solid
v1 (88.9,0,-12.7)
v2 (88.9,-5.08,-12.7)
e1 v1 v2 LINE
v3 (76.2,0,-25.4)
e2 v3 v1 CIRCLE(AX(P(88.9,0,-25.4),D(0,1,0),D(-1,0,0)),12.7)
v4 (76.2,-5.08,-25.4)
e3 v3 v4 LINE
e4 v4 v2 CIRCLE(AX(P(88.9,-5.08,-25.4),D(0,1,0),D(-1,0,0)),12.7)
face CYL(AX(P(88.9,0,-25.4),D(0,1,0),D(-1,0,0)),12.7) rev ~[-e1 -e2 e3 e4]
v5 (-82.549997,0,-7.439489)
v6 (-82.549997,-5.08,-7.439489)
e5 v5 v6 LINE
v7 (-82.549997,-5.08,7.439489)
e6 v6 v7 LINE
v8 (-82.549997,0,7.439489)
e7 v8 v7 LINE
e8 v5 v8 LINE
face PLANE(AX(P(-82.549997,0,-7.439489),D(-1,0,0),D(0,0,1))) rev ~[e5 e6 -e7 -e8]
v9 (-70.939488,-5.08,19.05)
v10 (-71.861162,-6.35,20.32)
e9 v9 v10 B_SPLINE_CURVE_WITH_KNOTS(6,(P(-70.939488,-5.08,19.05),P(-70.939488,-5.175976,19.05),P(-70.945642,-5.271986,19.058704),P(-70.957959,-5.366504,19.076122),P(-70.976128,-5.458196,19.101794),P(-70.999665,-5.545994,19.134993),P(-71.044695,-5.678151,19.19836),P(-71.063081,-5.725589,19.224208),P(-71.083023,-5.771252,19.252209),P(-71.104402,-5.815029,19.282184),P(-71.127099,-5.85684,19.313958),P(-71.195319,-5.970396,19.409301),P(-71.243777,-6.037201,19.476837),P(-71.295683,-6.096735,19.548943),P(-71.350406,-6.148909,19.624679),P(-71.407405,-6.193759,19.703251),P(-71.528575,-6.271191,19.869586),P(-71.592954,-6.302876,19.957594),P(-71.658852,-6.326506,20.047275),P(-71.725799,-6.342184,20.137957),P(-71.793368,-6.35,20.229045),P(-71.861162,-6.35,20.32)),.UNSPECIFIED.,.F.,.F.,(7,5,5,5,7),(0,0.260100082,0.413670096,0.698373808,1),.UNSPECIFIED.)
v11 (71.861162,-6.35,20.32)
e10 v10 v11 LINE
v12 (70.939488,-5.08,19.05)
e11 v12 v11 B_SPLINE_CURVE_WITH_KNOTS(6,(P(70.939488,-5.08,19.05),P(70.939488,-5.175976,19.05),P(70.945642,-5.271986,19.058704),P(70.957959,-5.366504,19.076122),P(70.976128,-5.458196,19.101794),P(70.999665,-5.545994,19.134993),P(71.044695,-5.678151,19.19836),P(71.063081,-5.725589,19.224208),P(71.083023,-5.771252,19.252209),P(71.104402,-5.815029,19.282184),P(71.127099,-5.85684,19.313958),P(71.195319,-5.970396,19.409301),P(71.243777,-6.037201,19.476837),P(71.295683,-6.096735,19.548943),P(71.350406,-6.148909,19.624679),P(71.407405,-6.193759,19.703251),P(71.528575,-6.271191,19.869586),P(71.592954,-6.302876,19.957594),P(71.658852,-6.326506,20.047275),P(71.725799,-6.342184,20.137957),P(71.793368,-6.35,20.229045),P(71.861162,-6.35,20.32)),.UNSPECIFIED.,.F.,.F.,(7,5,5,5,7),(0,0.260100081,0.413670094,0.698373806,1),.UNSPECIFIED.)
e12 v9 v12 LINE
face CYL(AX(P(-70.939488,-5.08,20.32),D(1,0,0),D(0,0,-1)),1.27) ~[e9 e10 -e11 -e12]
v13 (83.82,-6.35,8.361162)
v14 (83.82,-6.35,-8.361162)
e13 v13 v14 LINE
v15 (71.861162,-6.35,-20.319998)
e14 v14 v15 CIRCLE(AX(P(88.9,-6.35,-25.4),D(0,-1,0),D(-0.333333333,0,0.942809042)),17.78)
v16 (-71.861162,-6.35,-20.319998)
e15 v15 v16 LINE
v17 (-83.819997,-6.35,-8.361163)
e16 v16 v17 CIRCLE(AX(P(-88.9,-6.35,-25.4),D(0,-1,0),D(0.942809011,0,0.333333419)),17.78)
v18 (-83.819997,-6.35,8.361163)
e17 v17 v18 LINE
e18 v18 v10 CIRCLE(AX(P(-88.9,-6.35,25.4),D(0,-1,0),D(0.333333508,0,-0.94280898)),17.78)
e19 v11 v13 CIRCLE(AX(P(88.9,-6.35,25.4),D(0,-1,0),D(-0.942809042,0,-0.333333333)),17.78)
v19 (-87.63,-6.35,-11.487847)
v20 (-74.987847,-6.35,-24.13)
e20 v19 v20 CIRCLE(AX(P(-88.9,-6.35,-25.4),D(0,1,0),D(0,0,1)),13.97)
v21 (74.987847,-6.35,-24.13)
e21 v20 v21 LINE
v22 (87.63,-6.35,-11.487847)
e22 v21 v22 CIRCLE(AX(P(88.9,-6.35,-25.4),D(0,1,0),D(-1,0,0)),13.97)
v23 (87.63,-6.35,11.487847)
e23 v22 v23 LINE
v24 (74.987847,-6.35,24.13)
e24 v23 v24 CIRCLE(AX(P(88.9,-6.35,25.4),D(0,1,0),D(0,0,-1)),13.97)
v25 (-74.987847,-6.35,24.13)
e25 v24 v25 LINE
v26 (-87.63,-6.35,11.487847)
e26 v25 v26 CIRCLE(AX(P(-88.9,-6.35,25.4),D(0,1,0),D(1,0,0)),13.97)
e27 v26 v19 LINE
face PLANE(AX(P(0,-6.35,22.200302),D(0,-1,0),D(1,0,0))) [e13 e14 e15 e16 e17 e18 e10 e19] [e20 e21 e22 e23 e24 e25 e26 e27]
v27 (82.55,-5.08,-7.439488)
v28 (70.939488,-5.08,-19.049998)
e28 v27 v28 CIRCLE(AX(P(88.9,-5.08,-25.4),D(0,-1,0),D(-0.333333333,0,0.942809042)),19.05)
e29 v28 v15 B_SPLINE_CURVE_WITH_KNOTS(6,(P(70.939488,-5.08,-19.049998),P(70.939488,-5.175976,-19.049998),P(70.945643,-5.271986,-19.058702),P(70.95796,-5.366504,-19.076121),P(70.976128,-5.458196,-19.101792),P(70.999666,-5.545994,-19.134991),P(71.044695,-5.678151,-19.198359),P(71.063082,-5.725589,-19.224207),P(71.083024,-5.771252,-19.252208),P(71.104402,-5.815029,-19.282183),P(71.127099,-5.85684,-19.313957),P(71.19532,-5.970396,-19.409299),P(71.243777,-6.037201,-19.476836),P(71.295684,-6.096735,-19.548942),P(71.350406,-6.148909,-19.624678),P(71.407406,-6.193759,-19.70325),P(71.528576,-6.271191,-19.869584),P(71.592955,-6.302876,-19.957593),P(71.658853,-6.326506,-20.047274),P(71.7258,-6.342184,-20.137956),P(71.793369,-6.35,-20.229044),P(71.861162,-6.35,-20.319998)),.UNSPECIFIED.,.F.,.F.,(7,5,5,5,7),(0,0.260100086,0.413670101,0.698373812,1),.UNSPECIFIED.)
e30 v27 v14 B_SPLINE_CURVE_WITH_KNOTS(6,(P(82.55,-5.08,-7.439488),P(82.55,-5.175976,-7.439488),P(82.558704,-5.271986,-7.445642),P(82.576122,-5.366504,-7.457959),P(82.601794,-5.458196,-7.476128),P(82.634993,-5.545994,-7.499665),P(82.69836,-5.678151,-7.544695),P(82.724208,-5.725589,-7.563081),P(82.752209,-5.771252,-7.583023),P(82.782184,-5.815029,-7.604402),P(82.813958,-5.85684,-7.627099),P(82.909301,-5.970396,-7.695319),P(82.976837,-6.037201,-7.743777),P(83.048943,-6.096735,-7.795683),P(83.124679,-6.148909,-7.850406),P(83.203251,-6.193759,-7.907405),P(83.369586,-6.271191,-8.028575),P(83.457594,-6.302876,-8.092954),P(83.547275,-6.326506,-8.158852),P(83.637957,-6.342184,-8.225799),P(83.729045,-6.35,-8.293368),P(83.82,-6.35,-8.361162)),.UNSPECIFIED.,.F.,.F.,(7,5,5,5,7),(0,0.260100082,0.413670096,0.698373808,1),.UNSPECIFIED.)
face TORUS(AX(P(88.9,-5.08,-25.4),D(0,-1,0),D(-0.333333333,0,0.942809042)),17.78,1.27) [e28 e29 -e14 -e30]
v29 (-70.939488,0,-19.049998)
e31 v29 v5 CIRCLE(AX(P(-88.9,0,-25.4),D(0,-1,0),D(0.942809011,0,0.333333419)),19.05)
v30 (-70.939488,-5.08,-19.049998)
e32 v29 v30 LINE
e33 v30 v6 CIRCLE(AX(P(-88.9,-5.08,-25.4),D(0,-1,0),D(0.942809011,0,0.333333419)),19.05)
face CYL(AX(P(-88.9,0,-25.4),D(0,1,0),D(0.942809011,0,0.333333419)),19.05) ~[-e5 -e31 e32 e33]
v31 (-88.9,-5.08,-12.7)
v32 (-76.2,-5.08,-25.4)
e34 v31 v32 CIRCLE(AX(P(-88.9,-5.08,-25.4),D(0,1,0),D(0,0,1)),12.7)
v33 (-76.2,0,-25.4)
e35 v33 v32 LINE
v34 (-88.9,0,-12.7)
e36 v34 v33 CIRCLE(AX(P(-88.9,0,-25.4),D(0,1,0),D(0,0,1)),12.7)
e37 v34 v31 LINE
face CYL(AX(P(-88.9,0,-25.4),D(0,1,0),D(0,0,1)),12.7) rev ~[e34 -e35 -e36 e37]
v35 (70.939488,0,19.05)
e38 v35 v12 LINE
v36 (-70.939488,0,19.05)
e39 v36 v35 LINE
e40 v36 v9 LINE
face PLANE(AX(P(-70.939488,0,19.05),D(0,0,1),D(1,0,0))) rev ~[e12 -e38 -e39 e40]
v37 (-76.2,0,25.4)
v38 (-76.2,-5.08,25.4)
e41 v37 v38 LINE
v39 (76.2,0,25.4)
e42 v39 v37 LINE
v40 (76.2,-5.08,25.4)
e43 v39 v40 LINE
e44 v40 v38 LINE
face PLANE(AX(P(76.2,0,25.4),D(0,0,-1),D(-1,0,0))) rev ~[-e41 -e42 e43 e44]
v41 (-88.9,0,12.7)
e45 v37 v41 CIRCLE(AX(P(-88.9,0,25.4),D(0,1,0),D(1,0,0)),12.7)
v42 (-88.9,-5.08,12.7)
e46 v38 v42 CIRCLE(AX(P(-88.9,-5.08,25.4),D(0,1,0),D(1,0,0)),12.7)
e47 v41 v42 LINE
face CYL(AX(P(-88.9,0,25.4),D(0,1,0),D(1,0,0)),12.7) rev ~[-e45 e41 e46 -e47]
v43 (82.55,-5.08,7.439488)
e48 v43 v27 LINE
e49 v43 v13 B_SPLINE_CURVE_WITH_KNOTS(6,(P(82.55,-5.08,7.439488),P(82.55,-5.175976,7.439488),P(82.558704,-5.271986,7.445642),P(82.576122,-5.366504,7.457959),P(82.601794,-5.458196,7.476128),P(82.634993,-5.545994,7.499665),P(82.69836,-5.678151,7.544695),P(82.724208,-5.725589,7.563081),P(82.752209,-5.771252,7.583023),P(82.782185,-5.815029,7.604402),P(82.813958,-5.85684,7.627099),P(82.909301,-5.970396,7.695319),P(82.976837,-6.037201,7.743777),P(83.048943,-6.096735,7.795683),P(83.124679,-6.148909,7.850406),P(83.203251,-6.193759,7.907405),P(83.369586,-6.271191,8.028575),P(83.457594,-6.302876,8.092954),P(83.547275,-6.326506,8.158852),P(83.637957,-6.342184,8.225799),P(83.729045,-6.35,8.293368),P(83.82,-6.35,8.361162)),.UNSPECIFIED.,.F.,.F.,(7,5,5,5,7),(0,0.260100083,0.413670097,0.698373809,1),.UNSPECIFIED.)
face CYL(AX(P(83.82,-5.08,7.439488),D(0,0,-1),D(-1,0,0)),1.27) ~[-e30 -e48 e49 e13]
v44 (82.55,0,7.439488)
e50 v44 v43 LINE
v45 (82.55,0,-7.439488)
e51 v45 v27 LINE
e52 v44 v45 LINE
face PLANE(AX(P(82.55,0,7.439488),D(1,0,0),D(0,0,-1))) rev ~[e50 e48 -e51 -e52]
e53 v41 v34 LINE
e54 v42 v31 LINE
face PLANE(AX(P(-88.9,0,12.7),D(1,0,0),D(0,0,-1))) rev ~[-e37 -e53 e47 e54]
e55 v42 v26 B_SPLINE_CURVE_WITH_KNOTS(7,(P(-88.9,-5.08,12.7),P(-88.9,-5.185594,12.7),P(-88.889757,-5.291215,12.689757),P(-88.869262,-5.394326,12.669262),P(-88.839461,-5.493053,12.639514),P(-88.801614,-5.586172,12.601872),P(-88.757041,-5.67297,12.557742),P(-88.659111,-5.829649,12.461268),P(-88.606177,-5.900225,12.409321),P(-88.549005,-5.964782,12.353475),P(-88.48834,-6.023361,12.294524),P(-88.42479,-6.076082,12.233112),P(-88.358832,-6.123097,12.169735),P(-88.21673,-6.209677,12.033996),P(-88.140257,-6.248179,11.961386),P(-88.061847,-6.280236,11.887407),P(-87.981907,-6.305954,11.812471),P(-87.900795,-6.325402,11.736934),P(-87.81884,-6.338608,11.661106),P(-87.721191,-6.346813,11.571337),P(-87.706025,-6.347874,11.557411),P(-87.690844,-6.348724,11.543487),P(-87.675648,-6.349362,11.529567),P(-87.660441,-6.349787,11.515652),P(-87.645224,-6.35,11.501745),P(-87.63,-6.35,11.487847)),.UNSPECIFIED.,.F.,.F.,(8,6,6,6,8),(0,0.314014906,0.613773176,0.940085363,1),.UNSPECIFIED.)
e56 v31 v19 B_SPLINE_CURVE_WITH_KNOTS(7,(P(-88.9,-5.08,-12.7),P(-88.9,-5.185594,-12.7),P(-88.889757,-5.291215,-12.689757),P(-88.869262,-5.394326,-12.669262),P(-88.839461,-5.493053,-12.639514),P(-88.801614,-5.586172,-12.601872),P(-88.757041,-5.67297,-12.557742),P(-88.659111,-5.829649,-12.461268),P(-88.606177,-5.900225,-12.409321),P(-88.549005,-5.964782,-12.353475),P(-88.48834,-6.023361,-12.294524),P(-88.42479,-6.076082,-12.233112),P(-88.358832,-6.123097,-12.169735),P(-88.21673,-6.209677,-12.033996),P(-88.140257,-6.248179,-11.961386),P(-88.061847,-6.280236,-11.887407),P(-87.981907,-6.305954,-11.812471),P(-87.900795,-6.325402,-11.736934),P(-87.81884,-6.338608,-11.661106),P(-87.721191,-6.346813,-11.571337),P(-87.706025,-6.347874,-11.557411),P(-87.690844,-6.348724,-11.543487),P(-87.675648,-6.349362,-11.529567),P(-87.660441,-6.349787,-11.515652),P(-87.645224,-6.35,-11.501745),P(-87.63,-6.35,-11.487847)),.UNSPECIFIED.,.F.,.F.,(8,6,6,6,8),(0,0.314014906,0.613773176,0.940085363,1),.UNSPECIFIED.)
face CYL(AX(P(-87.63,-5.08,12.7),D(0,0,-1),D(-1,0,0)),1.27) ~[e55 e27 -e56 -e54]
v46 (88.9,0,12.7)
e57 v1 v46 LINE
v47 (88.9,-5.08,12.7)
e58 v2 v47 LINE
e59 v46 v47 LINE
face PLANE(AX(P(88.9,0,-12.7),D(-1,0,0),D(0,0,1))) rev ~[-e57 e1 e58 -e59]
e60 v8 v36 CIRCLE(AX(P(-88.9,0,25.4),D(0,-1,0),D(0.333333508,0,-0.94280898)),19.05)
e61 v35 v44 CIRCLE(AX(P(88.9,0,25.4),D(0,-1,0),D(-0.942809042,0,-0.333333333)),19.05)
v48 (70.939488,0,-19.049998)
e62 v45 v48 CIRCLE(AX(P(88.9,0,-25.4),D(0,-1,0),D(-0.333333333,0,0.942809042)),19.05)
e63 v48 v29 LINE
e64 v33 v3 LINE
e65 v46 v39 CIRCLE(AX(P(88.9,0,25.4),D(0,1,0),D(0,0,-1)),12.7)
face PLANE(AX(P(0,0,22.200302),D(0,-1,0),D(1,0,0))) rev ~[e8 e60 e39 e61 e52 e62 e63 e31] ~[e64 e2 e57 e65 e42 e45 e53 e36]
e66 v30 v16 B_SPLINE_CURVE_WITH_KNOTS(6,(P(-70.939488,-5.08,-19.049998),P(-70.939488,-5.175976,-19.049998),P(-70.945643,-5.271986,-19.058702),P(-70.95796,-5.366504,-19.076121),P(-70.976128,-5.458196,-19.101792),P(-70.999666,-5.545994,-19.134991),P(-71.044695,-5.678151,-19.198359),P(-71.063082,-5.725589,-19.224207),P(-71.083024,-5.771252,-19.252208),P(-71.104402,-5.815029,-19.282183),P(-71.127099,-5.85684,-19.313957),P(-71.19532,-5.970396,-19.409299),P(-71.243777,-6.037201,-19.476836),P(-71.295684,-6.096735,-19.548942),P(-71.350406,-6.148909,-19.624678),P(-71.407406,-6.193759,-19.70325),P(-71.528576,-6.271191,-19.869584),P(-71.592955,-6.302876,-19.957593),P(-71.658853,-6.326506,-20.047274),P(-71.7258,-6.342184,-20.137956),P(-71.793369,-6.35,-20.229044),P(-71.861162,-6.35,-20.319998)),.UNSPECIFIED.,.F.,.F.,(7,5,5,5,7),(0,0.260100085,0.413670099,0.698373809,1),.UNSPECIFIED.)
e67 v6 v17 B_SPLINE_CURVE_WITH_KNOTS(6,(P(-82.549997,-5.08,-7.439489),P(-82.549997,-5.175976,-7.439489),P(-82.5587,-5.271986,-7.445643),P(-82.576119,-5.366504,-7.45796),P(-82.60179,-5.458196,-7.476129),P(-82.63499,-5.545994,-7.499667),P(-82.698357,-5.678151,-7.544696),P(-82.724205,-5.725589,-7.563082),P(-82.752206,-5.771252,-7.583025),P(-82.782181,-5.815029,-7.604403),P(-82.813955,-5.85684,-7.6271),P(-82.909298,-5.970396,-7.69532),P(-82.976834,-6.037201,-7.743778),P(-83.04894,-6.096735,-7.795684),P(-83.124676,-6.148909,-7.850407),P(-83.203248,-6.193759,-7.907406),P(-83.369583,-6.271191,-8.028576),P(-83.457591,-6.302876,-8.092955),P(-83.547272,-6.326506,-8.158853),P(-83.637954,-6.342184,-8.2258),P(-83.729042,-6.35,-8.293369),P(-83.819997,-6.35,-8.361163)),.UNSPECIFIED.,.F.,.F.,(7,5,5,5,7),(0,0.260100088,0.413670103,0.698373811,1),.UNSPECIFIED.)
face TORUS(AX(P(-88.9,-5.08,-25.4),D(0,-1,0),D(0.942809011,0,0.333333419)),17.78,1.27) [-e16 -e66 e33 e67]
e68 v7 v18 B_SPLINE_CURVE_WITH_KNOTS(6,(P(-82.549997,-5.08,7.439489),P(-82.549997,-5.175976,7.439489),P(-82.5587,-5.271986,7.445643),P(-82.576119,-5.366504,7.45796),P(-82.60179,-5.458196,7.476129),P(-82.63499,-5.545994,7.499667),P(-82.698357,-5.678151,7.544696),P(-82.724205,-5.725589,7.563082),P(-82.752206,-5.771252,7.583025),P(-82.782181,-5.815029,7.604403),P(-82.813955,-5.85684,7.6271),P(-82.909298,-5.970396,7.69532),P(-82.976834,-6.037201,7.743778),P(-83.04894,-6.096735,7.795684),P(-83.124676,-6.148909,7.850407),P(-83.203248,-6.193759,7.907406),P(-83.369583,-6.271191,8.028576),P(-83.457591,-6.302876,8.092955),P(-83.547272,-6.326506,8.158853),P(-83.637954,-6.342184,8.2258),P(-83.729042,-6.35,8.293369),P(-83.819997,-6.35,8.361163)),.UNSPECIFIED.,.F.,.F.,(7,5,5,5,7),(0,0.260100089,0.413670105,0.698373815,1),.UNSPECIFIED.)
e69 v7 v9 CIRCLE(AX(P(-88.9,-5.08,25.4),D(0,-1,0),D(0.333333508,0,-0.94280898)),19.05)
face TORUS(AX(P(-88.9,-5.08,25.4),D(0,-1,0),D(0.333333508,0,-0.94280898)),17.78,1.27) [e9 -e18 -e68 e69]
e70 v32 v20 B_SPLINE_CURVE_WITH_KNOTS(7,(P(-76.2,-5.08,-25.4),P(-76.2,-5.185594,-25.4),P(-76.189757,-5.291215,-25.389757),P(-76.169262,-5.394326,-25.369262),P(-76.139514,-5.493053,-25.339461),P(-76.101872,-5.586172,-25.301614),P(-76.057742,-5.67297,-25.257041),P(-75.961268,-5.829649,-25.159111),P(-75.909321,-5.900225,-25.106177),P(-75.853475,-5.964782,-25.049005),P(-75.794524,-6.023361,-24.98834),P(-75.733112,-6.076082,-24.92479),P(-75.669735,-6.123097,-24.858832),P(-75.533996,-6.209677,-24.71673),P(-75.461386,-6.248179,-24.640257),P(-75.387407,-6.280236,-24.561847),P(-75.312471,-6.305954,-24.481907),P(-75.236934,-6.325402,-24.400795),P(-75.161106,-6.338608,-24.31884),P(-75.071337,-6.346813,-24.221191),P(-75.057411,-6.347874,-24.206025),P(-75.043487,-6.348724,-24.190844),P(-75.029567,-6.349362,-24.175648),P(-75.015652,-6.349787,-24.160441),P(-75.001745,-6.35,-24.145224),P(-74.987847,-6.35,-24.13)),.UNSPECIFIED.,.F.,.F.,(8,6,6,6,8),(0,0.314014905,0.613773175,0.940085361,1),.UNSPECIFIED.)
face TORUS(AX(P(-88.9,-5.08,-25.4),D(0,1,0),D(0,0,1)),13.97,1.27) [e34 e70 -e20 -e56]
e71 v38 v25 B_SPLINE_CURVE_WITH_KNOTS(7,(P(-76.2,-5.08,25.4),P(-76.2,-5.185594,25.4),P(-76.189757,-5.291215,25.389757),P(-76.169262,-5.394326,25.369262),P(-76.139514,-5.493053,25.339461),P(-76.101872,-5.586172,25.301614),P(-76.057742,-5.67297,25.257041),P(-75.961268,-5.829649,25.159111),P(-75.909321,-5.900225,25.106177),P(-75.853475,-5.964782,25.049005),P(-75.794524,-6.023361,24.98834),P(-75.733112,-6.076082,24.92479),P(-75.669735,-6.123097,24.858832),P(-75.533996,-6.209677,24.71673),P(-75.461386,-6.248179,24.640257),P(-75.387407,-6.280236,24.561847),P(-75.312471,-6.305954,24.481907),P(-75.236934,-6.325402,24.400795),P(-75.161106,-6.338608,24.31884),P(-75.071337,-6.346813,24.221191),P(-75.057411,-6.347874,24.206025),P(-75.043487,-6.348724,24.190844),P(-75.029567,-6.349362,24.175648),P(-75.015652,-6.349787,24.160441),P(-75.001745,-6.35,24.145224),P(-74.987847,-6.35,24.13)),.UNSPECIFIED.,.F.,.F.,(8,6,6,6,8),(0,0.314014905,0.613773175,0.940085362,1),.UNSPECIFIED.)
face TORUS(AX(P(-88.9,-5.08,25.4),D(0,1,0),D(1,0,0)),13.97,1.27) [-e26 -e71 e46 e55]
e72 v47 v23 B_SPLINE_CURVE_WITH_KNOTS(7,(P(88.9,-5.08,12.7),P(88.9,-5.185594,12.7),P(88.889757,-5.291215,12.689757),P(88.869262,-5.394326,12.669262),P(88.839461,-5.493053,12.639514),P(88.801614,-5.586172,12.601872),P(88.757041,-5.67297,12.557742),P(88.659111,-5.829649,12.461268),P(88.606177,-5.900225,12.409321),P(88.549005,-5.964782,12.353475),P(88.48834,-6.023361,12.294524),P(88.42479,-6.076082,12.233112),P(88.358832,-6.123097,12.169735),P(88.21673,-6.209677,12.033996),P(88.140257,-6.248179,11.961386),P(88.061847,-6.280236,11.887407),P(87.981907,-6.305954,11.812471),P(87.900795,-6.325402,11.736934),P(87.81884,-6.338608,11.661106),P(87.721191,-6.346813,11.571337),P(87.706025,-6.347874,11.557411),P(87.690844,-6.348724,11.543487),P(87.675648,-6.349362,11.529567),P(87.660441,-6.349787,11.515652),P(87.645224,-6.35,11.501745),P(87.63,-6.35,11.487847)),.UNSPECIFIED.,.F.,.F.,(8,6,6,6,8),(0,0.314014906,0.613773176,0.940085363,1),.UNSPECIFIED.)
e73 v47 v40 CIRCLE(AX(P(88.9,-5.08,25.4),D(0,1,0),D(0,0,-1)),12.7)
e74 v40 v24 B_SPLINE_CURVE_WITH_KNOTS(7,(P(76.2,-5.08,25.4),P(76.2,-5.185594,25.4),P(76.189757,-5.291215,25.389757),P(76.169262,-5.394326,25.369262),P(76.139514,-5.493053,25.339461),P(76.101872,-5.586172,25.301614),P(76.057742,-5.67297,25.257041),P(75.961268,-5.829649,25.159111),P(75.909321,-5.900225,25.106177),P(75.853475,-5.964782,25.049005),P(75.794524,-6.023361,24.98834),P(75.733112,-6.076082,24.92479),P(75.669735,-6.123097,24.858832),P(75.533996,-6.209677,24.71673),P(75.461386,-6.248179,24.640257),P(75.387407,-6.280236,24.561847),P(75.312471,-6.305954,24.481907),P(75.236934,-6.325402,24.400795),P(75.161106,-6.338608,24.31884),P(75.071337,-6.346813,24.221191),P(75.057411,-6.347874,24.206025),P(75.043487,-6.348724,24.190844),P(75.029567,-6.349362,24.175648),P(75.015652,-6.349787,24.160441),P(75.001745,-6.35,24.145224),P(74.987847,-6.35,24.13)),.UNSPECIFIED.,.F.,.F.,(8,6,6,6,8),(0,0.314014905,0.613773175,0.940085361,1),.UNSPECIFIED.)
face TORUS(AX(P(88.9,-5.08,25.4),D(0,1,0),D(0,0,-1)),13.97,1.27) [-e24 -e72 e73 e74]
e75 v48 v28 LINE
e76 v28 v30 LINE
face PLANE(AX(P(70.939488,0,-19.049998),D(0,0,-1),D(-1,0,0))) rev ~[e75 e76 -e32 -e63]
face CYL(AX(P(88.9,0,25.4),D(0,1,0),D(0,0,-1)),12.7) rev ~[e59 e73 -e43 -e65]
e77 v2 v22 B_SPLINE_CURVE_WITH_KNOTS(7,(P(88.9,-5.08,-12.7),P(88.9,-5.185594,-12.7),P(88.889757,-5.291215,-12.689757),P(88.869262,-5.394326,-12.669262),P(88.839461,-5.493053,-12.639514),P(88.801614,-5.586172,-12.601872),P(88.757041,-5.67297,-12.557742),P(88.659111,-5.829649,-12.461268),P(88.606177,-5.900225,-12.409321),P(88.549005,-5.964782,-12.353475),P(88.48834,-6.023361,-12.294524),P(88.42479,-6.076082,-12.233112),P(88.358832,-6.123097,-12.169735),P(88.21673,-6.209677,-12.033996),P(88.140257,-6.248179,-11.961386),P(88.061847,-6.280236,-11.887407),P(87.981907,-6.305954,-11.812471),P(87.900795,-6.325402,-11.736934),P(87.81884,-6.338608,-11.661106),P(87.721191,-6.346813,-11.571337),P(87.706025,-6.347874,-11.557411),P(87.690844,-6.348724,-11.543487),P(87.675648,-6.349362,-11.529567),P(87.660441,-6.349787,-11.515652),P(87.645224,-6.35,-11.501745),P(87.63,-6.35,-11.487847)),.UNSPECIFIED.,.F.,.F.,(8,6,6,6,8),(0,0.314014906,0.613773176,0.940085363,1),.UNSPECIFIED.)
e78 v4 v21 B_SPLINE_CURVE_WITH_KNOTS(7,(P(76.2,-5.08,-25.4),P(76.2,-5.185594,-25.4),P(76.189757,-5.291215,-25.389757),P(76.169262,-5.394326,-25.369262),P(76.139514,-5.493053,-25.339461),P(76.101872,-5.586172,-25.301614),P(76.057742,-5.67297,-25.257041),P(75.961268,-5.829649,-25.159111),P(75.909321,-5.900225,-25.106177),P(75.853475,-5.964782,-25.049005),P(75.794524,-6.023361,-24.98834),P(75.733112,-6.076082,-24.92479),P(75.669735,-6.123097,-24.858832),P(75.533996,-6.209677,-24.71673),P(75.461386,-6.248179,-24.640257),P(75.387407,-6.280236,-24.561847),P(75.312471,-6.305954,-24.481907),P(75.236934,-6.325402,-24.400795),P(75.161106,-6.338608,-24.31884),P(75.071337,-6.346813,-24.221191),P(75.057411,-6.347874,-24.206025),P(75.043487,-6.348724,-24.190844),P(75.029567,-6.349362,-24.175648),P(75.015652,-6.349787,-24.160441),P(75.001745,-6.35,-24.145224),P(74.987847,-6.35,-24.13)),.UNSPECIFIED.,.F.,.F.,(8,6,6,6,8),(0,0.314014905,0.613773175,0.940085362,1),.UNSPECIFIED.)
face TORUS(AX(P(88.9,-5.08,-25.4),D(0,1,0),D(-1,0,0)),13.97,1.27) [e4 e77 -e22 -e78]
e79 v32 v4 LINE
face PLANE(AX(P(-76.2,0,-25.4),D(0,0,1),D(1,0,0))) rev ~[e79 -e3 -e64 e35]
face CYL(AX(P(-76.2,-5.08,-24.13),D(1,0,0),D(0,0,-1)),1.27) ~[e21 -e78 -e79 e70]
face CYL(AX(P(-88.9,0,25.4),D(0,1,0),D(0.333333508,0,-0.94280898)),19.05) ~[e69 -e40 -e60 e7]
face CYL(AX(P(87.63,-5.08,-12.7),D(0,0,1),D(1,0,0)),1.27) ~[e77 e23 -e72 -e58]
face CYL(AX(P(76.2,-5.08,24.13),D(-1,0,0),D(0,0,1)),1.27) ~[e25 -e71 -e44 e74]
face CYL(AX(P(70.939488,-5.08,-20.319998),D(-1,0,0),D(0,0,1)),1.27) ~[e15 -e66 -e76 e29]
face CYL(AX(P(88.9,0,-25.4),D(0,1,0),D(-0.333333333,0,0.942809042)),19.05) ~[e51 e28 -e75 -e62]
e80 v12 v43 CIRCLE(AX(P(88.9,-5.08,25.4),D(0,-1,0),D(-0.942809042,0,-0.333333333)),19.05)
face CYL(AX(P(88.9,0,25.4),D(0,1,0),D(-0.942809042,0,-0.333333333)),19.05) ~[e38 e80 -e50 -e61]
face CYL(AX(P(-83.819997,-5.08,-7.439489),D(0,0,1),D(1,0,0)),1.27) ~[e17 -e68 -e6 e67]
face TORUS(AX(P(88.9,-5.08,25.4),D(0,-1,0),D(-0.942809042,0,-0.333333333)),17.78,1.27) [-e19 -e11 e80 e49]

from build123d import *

# Parameters (mm, degrees)
F1_DEPTH = 6.35
F2_R     = 1.27


with BuildPart() as f1:
    # F0 (on Front) → F1 (new body)
    with BuildSketch(Plane.XZ):
        with BuildLine():
            ThreePointArc((-69.85, 25.4), (-70.1243474386, 22.1786073053), (-70.9394877579, 19.05))
            Line((-70.9394877579, 19.05), (70.9394877579, 19.05))
            ThreePointArc((70.9394877579, 19.05), (70.1243474386, 22.1786073053), (69.85, 25.4))
            Line((69.85, 25.4), (-69.85, 25.4))
        make_face()
        with BuildLine():
            Line((-88.9, 12.7), (-88.9, 6.35))
            ThreePointArc((-88.9, 6.35), (-85.6786055668, 6.6243477369), (-82.5499966741, 7.4394889338))
            ThreePointArc((-82.5499966741, 7.4394889338), (-75.4296145712, 11.9296170656), (-70.9394877579, 19.05))
            ThreePointArc((-70.9394877579, 19.05), (-70.1243474386, 22.1786073053), (-69.85, 25.4))
            Line((-69.85, 25.4), (-76.2, 25.4))
            ThreePointArc((-76.2, 25.4), (-79.9197438789, 16.4197438789), (-88.9, 12.7))
        make_face()
        with BuildLine():
            ThreePointArc((-88.9, -12.7), (-79.9197438789, -16.4197438789), (-76.2, -25.4))
            Line((-76.2, -25.4), (-69.85, -25.4))
            ThreePointArc((-69.85, -25.4), (-70.1243475845, -22.1786064547), (-70.9394883332, -19.0499983728))
            ThreePointArc((-70.9394883332, -19.0499983728), (-75.4296151814, -11.9296164554), (-82.5499966741, -7.4394889338))
            ThreePointArc((-82.5499966741, -7.4394889338), (-85.6786055668, -6.6243477369), (-88.9, -6.35))
            Line((-88.9, -6.35), (-88.9, -12.7))
        make_face()
        with BuildLine():
            Line((-88.9, 6.35), (-88.9, -6.35))
            ThreePointArc((-88.9, -6.35), (-85.6786055668, -6.6243477369), (-82.5499966741, -7.4394889338))
            Line((-82.5499966741, -7.4394889338), (-82.5499966741, 7.4394889338))
            ThreePointArc((-82.5499966741, 7.4394889338), (-85.6786055668, 6.6243477369), (-88.9, 6.35))
        make_face()
        with BuildLine():
            ThreePointArc((-70.9394883332, -19.0499983728), (-70.1243475845, -22.1786064547), (-69.85, -25.4))
            Line((-69.85, -25.4), (69.85, -25.4))
            ThreePointArc((69.85, -25.4), (70.1243475845, -22.1786064547), (70.9394883332, -19.0499983728))
            Line((70.9394883332, -19.0499983728), (-70.9394883332, -19.0499983728))
        make_face()
        with BuildLine():
            ThreePointArc((70.9394883332, -19.0499983728), (70.1243475845, -22.1786064547), (69.85, -25.4))
            Line((69.85, -25.4), (76.2, -25.4))
            ThreePointArc((76.2, -25.4), (79.9197438789, -16.4197438789), (88.9, -12.7))
            Line((88.9, -12.7), (88.9, -6.35))
            ThreePointArc((88.9, -6.35), (85.6786073053, -6.6243474386), (82.55, -7.4394877579))
            ThreePointArc((82.55, -7.4394877579), (75.4296164286, -11.9296152082), (70.9394883332, -19.0499983728))
        make_face()
        with BuildLine():
            Line((82.55, 7.4394877579), (82.55, -7.4394877579))
            ThreePointArc((82.55, -7.4394877579), (85.6786073053, -6.6243474386), (88.9, -6.35))
            Line((88.9, -6.35), (88.9, 6.35))
            ThreePointArc((88.9, 6.35), (85.6786073053, 6.6243474386), (82.55, 7.4394877579))
        make_face()
        with BuildLine():
            ThreePointArc((70.9394877579, 19.05), (75.4296158184, 11.9296158184), (82.55, 7.4394877579))
            ThreePointArc((82.55, 7.4394877579), (85.6786073053, 6.6243474386), (88.9, 6.35))
            Line((88.9, 6.35), (88.9, 12.7))
            ThreePointArc((88.9, 12.7), (79.9197438789, 16.4197438789), (76.2, 25.4))
            Line((76.2, 25.4), (69.85, 25.4))
            ThreePointArc((69.85, 25.4), (70.1243474386, 22.1786073053), (70.9394877579, 19.05))
        make_face()
    extrude(amount=F1_DEPTH)

    # F2
    f2_edges = [f1.edges().sort_by_distance(p)[0] for p in [
        (-79.919744, -6.35, 16.419744),
        (-88.9, -6.35, 0),
        (-79.919744, -6.35, -16.419744),
        (0, -6.35, -25.4),
        (0, -6.35, 25.4),
        (79.919744, -6.35, 16.419744),
        (88.9, -6.35, 0),
        (79.919744, -6.35, -16.419744),
        (82.55, -6.35, 0),
        (75.429616, -6.35, 11.929616),
        (0, -6.35, 19.05),
        (-75.429615, -6.35, 11.929617),
        (-82.549997, -6.35, 0),
        (-75.429615, -6.35, -11.929616),
        (0, -6.35, -19.049998),
        (75.429616, -6.35, -11.929615),
    ]]
    fillet(f2_edges, radius=F2_R)


solid = f1.part
